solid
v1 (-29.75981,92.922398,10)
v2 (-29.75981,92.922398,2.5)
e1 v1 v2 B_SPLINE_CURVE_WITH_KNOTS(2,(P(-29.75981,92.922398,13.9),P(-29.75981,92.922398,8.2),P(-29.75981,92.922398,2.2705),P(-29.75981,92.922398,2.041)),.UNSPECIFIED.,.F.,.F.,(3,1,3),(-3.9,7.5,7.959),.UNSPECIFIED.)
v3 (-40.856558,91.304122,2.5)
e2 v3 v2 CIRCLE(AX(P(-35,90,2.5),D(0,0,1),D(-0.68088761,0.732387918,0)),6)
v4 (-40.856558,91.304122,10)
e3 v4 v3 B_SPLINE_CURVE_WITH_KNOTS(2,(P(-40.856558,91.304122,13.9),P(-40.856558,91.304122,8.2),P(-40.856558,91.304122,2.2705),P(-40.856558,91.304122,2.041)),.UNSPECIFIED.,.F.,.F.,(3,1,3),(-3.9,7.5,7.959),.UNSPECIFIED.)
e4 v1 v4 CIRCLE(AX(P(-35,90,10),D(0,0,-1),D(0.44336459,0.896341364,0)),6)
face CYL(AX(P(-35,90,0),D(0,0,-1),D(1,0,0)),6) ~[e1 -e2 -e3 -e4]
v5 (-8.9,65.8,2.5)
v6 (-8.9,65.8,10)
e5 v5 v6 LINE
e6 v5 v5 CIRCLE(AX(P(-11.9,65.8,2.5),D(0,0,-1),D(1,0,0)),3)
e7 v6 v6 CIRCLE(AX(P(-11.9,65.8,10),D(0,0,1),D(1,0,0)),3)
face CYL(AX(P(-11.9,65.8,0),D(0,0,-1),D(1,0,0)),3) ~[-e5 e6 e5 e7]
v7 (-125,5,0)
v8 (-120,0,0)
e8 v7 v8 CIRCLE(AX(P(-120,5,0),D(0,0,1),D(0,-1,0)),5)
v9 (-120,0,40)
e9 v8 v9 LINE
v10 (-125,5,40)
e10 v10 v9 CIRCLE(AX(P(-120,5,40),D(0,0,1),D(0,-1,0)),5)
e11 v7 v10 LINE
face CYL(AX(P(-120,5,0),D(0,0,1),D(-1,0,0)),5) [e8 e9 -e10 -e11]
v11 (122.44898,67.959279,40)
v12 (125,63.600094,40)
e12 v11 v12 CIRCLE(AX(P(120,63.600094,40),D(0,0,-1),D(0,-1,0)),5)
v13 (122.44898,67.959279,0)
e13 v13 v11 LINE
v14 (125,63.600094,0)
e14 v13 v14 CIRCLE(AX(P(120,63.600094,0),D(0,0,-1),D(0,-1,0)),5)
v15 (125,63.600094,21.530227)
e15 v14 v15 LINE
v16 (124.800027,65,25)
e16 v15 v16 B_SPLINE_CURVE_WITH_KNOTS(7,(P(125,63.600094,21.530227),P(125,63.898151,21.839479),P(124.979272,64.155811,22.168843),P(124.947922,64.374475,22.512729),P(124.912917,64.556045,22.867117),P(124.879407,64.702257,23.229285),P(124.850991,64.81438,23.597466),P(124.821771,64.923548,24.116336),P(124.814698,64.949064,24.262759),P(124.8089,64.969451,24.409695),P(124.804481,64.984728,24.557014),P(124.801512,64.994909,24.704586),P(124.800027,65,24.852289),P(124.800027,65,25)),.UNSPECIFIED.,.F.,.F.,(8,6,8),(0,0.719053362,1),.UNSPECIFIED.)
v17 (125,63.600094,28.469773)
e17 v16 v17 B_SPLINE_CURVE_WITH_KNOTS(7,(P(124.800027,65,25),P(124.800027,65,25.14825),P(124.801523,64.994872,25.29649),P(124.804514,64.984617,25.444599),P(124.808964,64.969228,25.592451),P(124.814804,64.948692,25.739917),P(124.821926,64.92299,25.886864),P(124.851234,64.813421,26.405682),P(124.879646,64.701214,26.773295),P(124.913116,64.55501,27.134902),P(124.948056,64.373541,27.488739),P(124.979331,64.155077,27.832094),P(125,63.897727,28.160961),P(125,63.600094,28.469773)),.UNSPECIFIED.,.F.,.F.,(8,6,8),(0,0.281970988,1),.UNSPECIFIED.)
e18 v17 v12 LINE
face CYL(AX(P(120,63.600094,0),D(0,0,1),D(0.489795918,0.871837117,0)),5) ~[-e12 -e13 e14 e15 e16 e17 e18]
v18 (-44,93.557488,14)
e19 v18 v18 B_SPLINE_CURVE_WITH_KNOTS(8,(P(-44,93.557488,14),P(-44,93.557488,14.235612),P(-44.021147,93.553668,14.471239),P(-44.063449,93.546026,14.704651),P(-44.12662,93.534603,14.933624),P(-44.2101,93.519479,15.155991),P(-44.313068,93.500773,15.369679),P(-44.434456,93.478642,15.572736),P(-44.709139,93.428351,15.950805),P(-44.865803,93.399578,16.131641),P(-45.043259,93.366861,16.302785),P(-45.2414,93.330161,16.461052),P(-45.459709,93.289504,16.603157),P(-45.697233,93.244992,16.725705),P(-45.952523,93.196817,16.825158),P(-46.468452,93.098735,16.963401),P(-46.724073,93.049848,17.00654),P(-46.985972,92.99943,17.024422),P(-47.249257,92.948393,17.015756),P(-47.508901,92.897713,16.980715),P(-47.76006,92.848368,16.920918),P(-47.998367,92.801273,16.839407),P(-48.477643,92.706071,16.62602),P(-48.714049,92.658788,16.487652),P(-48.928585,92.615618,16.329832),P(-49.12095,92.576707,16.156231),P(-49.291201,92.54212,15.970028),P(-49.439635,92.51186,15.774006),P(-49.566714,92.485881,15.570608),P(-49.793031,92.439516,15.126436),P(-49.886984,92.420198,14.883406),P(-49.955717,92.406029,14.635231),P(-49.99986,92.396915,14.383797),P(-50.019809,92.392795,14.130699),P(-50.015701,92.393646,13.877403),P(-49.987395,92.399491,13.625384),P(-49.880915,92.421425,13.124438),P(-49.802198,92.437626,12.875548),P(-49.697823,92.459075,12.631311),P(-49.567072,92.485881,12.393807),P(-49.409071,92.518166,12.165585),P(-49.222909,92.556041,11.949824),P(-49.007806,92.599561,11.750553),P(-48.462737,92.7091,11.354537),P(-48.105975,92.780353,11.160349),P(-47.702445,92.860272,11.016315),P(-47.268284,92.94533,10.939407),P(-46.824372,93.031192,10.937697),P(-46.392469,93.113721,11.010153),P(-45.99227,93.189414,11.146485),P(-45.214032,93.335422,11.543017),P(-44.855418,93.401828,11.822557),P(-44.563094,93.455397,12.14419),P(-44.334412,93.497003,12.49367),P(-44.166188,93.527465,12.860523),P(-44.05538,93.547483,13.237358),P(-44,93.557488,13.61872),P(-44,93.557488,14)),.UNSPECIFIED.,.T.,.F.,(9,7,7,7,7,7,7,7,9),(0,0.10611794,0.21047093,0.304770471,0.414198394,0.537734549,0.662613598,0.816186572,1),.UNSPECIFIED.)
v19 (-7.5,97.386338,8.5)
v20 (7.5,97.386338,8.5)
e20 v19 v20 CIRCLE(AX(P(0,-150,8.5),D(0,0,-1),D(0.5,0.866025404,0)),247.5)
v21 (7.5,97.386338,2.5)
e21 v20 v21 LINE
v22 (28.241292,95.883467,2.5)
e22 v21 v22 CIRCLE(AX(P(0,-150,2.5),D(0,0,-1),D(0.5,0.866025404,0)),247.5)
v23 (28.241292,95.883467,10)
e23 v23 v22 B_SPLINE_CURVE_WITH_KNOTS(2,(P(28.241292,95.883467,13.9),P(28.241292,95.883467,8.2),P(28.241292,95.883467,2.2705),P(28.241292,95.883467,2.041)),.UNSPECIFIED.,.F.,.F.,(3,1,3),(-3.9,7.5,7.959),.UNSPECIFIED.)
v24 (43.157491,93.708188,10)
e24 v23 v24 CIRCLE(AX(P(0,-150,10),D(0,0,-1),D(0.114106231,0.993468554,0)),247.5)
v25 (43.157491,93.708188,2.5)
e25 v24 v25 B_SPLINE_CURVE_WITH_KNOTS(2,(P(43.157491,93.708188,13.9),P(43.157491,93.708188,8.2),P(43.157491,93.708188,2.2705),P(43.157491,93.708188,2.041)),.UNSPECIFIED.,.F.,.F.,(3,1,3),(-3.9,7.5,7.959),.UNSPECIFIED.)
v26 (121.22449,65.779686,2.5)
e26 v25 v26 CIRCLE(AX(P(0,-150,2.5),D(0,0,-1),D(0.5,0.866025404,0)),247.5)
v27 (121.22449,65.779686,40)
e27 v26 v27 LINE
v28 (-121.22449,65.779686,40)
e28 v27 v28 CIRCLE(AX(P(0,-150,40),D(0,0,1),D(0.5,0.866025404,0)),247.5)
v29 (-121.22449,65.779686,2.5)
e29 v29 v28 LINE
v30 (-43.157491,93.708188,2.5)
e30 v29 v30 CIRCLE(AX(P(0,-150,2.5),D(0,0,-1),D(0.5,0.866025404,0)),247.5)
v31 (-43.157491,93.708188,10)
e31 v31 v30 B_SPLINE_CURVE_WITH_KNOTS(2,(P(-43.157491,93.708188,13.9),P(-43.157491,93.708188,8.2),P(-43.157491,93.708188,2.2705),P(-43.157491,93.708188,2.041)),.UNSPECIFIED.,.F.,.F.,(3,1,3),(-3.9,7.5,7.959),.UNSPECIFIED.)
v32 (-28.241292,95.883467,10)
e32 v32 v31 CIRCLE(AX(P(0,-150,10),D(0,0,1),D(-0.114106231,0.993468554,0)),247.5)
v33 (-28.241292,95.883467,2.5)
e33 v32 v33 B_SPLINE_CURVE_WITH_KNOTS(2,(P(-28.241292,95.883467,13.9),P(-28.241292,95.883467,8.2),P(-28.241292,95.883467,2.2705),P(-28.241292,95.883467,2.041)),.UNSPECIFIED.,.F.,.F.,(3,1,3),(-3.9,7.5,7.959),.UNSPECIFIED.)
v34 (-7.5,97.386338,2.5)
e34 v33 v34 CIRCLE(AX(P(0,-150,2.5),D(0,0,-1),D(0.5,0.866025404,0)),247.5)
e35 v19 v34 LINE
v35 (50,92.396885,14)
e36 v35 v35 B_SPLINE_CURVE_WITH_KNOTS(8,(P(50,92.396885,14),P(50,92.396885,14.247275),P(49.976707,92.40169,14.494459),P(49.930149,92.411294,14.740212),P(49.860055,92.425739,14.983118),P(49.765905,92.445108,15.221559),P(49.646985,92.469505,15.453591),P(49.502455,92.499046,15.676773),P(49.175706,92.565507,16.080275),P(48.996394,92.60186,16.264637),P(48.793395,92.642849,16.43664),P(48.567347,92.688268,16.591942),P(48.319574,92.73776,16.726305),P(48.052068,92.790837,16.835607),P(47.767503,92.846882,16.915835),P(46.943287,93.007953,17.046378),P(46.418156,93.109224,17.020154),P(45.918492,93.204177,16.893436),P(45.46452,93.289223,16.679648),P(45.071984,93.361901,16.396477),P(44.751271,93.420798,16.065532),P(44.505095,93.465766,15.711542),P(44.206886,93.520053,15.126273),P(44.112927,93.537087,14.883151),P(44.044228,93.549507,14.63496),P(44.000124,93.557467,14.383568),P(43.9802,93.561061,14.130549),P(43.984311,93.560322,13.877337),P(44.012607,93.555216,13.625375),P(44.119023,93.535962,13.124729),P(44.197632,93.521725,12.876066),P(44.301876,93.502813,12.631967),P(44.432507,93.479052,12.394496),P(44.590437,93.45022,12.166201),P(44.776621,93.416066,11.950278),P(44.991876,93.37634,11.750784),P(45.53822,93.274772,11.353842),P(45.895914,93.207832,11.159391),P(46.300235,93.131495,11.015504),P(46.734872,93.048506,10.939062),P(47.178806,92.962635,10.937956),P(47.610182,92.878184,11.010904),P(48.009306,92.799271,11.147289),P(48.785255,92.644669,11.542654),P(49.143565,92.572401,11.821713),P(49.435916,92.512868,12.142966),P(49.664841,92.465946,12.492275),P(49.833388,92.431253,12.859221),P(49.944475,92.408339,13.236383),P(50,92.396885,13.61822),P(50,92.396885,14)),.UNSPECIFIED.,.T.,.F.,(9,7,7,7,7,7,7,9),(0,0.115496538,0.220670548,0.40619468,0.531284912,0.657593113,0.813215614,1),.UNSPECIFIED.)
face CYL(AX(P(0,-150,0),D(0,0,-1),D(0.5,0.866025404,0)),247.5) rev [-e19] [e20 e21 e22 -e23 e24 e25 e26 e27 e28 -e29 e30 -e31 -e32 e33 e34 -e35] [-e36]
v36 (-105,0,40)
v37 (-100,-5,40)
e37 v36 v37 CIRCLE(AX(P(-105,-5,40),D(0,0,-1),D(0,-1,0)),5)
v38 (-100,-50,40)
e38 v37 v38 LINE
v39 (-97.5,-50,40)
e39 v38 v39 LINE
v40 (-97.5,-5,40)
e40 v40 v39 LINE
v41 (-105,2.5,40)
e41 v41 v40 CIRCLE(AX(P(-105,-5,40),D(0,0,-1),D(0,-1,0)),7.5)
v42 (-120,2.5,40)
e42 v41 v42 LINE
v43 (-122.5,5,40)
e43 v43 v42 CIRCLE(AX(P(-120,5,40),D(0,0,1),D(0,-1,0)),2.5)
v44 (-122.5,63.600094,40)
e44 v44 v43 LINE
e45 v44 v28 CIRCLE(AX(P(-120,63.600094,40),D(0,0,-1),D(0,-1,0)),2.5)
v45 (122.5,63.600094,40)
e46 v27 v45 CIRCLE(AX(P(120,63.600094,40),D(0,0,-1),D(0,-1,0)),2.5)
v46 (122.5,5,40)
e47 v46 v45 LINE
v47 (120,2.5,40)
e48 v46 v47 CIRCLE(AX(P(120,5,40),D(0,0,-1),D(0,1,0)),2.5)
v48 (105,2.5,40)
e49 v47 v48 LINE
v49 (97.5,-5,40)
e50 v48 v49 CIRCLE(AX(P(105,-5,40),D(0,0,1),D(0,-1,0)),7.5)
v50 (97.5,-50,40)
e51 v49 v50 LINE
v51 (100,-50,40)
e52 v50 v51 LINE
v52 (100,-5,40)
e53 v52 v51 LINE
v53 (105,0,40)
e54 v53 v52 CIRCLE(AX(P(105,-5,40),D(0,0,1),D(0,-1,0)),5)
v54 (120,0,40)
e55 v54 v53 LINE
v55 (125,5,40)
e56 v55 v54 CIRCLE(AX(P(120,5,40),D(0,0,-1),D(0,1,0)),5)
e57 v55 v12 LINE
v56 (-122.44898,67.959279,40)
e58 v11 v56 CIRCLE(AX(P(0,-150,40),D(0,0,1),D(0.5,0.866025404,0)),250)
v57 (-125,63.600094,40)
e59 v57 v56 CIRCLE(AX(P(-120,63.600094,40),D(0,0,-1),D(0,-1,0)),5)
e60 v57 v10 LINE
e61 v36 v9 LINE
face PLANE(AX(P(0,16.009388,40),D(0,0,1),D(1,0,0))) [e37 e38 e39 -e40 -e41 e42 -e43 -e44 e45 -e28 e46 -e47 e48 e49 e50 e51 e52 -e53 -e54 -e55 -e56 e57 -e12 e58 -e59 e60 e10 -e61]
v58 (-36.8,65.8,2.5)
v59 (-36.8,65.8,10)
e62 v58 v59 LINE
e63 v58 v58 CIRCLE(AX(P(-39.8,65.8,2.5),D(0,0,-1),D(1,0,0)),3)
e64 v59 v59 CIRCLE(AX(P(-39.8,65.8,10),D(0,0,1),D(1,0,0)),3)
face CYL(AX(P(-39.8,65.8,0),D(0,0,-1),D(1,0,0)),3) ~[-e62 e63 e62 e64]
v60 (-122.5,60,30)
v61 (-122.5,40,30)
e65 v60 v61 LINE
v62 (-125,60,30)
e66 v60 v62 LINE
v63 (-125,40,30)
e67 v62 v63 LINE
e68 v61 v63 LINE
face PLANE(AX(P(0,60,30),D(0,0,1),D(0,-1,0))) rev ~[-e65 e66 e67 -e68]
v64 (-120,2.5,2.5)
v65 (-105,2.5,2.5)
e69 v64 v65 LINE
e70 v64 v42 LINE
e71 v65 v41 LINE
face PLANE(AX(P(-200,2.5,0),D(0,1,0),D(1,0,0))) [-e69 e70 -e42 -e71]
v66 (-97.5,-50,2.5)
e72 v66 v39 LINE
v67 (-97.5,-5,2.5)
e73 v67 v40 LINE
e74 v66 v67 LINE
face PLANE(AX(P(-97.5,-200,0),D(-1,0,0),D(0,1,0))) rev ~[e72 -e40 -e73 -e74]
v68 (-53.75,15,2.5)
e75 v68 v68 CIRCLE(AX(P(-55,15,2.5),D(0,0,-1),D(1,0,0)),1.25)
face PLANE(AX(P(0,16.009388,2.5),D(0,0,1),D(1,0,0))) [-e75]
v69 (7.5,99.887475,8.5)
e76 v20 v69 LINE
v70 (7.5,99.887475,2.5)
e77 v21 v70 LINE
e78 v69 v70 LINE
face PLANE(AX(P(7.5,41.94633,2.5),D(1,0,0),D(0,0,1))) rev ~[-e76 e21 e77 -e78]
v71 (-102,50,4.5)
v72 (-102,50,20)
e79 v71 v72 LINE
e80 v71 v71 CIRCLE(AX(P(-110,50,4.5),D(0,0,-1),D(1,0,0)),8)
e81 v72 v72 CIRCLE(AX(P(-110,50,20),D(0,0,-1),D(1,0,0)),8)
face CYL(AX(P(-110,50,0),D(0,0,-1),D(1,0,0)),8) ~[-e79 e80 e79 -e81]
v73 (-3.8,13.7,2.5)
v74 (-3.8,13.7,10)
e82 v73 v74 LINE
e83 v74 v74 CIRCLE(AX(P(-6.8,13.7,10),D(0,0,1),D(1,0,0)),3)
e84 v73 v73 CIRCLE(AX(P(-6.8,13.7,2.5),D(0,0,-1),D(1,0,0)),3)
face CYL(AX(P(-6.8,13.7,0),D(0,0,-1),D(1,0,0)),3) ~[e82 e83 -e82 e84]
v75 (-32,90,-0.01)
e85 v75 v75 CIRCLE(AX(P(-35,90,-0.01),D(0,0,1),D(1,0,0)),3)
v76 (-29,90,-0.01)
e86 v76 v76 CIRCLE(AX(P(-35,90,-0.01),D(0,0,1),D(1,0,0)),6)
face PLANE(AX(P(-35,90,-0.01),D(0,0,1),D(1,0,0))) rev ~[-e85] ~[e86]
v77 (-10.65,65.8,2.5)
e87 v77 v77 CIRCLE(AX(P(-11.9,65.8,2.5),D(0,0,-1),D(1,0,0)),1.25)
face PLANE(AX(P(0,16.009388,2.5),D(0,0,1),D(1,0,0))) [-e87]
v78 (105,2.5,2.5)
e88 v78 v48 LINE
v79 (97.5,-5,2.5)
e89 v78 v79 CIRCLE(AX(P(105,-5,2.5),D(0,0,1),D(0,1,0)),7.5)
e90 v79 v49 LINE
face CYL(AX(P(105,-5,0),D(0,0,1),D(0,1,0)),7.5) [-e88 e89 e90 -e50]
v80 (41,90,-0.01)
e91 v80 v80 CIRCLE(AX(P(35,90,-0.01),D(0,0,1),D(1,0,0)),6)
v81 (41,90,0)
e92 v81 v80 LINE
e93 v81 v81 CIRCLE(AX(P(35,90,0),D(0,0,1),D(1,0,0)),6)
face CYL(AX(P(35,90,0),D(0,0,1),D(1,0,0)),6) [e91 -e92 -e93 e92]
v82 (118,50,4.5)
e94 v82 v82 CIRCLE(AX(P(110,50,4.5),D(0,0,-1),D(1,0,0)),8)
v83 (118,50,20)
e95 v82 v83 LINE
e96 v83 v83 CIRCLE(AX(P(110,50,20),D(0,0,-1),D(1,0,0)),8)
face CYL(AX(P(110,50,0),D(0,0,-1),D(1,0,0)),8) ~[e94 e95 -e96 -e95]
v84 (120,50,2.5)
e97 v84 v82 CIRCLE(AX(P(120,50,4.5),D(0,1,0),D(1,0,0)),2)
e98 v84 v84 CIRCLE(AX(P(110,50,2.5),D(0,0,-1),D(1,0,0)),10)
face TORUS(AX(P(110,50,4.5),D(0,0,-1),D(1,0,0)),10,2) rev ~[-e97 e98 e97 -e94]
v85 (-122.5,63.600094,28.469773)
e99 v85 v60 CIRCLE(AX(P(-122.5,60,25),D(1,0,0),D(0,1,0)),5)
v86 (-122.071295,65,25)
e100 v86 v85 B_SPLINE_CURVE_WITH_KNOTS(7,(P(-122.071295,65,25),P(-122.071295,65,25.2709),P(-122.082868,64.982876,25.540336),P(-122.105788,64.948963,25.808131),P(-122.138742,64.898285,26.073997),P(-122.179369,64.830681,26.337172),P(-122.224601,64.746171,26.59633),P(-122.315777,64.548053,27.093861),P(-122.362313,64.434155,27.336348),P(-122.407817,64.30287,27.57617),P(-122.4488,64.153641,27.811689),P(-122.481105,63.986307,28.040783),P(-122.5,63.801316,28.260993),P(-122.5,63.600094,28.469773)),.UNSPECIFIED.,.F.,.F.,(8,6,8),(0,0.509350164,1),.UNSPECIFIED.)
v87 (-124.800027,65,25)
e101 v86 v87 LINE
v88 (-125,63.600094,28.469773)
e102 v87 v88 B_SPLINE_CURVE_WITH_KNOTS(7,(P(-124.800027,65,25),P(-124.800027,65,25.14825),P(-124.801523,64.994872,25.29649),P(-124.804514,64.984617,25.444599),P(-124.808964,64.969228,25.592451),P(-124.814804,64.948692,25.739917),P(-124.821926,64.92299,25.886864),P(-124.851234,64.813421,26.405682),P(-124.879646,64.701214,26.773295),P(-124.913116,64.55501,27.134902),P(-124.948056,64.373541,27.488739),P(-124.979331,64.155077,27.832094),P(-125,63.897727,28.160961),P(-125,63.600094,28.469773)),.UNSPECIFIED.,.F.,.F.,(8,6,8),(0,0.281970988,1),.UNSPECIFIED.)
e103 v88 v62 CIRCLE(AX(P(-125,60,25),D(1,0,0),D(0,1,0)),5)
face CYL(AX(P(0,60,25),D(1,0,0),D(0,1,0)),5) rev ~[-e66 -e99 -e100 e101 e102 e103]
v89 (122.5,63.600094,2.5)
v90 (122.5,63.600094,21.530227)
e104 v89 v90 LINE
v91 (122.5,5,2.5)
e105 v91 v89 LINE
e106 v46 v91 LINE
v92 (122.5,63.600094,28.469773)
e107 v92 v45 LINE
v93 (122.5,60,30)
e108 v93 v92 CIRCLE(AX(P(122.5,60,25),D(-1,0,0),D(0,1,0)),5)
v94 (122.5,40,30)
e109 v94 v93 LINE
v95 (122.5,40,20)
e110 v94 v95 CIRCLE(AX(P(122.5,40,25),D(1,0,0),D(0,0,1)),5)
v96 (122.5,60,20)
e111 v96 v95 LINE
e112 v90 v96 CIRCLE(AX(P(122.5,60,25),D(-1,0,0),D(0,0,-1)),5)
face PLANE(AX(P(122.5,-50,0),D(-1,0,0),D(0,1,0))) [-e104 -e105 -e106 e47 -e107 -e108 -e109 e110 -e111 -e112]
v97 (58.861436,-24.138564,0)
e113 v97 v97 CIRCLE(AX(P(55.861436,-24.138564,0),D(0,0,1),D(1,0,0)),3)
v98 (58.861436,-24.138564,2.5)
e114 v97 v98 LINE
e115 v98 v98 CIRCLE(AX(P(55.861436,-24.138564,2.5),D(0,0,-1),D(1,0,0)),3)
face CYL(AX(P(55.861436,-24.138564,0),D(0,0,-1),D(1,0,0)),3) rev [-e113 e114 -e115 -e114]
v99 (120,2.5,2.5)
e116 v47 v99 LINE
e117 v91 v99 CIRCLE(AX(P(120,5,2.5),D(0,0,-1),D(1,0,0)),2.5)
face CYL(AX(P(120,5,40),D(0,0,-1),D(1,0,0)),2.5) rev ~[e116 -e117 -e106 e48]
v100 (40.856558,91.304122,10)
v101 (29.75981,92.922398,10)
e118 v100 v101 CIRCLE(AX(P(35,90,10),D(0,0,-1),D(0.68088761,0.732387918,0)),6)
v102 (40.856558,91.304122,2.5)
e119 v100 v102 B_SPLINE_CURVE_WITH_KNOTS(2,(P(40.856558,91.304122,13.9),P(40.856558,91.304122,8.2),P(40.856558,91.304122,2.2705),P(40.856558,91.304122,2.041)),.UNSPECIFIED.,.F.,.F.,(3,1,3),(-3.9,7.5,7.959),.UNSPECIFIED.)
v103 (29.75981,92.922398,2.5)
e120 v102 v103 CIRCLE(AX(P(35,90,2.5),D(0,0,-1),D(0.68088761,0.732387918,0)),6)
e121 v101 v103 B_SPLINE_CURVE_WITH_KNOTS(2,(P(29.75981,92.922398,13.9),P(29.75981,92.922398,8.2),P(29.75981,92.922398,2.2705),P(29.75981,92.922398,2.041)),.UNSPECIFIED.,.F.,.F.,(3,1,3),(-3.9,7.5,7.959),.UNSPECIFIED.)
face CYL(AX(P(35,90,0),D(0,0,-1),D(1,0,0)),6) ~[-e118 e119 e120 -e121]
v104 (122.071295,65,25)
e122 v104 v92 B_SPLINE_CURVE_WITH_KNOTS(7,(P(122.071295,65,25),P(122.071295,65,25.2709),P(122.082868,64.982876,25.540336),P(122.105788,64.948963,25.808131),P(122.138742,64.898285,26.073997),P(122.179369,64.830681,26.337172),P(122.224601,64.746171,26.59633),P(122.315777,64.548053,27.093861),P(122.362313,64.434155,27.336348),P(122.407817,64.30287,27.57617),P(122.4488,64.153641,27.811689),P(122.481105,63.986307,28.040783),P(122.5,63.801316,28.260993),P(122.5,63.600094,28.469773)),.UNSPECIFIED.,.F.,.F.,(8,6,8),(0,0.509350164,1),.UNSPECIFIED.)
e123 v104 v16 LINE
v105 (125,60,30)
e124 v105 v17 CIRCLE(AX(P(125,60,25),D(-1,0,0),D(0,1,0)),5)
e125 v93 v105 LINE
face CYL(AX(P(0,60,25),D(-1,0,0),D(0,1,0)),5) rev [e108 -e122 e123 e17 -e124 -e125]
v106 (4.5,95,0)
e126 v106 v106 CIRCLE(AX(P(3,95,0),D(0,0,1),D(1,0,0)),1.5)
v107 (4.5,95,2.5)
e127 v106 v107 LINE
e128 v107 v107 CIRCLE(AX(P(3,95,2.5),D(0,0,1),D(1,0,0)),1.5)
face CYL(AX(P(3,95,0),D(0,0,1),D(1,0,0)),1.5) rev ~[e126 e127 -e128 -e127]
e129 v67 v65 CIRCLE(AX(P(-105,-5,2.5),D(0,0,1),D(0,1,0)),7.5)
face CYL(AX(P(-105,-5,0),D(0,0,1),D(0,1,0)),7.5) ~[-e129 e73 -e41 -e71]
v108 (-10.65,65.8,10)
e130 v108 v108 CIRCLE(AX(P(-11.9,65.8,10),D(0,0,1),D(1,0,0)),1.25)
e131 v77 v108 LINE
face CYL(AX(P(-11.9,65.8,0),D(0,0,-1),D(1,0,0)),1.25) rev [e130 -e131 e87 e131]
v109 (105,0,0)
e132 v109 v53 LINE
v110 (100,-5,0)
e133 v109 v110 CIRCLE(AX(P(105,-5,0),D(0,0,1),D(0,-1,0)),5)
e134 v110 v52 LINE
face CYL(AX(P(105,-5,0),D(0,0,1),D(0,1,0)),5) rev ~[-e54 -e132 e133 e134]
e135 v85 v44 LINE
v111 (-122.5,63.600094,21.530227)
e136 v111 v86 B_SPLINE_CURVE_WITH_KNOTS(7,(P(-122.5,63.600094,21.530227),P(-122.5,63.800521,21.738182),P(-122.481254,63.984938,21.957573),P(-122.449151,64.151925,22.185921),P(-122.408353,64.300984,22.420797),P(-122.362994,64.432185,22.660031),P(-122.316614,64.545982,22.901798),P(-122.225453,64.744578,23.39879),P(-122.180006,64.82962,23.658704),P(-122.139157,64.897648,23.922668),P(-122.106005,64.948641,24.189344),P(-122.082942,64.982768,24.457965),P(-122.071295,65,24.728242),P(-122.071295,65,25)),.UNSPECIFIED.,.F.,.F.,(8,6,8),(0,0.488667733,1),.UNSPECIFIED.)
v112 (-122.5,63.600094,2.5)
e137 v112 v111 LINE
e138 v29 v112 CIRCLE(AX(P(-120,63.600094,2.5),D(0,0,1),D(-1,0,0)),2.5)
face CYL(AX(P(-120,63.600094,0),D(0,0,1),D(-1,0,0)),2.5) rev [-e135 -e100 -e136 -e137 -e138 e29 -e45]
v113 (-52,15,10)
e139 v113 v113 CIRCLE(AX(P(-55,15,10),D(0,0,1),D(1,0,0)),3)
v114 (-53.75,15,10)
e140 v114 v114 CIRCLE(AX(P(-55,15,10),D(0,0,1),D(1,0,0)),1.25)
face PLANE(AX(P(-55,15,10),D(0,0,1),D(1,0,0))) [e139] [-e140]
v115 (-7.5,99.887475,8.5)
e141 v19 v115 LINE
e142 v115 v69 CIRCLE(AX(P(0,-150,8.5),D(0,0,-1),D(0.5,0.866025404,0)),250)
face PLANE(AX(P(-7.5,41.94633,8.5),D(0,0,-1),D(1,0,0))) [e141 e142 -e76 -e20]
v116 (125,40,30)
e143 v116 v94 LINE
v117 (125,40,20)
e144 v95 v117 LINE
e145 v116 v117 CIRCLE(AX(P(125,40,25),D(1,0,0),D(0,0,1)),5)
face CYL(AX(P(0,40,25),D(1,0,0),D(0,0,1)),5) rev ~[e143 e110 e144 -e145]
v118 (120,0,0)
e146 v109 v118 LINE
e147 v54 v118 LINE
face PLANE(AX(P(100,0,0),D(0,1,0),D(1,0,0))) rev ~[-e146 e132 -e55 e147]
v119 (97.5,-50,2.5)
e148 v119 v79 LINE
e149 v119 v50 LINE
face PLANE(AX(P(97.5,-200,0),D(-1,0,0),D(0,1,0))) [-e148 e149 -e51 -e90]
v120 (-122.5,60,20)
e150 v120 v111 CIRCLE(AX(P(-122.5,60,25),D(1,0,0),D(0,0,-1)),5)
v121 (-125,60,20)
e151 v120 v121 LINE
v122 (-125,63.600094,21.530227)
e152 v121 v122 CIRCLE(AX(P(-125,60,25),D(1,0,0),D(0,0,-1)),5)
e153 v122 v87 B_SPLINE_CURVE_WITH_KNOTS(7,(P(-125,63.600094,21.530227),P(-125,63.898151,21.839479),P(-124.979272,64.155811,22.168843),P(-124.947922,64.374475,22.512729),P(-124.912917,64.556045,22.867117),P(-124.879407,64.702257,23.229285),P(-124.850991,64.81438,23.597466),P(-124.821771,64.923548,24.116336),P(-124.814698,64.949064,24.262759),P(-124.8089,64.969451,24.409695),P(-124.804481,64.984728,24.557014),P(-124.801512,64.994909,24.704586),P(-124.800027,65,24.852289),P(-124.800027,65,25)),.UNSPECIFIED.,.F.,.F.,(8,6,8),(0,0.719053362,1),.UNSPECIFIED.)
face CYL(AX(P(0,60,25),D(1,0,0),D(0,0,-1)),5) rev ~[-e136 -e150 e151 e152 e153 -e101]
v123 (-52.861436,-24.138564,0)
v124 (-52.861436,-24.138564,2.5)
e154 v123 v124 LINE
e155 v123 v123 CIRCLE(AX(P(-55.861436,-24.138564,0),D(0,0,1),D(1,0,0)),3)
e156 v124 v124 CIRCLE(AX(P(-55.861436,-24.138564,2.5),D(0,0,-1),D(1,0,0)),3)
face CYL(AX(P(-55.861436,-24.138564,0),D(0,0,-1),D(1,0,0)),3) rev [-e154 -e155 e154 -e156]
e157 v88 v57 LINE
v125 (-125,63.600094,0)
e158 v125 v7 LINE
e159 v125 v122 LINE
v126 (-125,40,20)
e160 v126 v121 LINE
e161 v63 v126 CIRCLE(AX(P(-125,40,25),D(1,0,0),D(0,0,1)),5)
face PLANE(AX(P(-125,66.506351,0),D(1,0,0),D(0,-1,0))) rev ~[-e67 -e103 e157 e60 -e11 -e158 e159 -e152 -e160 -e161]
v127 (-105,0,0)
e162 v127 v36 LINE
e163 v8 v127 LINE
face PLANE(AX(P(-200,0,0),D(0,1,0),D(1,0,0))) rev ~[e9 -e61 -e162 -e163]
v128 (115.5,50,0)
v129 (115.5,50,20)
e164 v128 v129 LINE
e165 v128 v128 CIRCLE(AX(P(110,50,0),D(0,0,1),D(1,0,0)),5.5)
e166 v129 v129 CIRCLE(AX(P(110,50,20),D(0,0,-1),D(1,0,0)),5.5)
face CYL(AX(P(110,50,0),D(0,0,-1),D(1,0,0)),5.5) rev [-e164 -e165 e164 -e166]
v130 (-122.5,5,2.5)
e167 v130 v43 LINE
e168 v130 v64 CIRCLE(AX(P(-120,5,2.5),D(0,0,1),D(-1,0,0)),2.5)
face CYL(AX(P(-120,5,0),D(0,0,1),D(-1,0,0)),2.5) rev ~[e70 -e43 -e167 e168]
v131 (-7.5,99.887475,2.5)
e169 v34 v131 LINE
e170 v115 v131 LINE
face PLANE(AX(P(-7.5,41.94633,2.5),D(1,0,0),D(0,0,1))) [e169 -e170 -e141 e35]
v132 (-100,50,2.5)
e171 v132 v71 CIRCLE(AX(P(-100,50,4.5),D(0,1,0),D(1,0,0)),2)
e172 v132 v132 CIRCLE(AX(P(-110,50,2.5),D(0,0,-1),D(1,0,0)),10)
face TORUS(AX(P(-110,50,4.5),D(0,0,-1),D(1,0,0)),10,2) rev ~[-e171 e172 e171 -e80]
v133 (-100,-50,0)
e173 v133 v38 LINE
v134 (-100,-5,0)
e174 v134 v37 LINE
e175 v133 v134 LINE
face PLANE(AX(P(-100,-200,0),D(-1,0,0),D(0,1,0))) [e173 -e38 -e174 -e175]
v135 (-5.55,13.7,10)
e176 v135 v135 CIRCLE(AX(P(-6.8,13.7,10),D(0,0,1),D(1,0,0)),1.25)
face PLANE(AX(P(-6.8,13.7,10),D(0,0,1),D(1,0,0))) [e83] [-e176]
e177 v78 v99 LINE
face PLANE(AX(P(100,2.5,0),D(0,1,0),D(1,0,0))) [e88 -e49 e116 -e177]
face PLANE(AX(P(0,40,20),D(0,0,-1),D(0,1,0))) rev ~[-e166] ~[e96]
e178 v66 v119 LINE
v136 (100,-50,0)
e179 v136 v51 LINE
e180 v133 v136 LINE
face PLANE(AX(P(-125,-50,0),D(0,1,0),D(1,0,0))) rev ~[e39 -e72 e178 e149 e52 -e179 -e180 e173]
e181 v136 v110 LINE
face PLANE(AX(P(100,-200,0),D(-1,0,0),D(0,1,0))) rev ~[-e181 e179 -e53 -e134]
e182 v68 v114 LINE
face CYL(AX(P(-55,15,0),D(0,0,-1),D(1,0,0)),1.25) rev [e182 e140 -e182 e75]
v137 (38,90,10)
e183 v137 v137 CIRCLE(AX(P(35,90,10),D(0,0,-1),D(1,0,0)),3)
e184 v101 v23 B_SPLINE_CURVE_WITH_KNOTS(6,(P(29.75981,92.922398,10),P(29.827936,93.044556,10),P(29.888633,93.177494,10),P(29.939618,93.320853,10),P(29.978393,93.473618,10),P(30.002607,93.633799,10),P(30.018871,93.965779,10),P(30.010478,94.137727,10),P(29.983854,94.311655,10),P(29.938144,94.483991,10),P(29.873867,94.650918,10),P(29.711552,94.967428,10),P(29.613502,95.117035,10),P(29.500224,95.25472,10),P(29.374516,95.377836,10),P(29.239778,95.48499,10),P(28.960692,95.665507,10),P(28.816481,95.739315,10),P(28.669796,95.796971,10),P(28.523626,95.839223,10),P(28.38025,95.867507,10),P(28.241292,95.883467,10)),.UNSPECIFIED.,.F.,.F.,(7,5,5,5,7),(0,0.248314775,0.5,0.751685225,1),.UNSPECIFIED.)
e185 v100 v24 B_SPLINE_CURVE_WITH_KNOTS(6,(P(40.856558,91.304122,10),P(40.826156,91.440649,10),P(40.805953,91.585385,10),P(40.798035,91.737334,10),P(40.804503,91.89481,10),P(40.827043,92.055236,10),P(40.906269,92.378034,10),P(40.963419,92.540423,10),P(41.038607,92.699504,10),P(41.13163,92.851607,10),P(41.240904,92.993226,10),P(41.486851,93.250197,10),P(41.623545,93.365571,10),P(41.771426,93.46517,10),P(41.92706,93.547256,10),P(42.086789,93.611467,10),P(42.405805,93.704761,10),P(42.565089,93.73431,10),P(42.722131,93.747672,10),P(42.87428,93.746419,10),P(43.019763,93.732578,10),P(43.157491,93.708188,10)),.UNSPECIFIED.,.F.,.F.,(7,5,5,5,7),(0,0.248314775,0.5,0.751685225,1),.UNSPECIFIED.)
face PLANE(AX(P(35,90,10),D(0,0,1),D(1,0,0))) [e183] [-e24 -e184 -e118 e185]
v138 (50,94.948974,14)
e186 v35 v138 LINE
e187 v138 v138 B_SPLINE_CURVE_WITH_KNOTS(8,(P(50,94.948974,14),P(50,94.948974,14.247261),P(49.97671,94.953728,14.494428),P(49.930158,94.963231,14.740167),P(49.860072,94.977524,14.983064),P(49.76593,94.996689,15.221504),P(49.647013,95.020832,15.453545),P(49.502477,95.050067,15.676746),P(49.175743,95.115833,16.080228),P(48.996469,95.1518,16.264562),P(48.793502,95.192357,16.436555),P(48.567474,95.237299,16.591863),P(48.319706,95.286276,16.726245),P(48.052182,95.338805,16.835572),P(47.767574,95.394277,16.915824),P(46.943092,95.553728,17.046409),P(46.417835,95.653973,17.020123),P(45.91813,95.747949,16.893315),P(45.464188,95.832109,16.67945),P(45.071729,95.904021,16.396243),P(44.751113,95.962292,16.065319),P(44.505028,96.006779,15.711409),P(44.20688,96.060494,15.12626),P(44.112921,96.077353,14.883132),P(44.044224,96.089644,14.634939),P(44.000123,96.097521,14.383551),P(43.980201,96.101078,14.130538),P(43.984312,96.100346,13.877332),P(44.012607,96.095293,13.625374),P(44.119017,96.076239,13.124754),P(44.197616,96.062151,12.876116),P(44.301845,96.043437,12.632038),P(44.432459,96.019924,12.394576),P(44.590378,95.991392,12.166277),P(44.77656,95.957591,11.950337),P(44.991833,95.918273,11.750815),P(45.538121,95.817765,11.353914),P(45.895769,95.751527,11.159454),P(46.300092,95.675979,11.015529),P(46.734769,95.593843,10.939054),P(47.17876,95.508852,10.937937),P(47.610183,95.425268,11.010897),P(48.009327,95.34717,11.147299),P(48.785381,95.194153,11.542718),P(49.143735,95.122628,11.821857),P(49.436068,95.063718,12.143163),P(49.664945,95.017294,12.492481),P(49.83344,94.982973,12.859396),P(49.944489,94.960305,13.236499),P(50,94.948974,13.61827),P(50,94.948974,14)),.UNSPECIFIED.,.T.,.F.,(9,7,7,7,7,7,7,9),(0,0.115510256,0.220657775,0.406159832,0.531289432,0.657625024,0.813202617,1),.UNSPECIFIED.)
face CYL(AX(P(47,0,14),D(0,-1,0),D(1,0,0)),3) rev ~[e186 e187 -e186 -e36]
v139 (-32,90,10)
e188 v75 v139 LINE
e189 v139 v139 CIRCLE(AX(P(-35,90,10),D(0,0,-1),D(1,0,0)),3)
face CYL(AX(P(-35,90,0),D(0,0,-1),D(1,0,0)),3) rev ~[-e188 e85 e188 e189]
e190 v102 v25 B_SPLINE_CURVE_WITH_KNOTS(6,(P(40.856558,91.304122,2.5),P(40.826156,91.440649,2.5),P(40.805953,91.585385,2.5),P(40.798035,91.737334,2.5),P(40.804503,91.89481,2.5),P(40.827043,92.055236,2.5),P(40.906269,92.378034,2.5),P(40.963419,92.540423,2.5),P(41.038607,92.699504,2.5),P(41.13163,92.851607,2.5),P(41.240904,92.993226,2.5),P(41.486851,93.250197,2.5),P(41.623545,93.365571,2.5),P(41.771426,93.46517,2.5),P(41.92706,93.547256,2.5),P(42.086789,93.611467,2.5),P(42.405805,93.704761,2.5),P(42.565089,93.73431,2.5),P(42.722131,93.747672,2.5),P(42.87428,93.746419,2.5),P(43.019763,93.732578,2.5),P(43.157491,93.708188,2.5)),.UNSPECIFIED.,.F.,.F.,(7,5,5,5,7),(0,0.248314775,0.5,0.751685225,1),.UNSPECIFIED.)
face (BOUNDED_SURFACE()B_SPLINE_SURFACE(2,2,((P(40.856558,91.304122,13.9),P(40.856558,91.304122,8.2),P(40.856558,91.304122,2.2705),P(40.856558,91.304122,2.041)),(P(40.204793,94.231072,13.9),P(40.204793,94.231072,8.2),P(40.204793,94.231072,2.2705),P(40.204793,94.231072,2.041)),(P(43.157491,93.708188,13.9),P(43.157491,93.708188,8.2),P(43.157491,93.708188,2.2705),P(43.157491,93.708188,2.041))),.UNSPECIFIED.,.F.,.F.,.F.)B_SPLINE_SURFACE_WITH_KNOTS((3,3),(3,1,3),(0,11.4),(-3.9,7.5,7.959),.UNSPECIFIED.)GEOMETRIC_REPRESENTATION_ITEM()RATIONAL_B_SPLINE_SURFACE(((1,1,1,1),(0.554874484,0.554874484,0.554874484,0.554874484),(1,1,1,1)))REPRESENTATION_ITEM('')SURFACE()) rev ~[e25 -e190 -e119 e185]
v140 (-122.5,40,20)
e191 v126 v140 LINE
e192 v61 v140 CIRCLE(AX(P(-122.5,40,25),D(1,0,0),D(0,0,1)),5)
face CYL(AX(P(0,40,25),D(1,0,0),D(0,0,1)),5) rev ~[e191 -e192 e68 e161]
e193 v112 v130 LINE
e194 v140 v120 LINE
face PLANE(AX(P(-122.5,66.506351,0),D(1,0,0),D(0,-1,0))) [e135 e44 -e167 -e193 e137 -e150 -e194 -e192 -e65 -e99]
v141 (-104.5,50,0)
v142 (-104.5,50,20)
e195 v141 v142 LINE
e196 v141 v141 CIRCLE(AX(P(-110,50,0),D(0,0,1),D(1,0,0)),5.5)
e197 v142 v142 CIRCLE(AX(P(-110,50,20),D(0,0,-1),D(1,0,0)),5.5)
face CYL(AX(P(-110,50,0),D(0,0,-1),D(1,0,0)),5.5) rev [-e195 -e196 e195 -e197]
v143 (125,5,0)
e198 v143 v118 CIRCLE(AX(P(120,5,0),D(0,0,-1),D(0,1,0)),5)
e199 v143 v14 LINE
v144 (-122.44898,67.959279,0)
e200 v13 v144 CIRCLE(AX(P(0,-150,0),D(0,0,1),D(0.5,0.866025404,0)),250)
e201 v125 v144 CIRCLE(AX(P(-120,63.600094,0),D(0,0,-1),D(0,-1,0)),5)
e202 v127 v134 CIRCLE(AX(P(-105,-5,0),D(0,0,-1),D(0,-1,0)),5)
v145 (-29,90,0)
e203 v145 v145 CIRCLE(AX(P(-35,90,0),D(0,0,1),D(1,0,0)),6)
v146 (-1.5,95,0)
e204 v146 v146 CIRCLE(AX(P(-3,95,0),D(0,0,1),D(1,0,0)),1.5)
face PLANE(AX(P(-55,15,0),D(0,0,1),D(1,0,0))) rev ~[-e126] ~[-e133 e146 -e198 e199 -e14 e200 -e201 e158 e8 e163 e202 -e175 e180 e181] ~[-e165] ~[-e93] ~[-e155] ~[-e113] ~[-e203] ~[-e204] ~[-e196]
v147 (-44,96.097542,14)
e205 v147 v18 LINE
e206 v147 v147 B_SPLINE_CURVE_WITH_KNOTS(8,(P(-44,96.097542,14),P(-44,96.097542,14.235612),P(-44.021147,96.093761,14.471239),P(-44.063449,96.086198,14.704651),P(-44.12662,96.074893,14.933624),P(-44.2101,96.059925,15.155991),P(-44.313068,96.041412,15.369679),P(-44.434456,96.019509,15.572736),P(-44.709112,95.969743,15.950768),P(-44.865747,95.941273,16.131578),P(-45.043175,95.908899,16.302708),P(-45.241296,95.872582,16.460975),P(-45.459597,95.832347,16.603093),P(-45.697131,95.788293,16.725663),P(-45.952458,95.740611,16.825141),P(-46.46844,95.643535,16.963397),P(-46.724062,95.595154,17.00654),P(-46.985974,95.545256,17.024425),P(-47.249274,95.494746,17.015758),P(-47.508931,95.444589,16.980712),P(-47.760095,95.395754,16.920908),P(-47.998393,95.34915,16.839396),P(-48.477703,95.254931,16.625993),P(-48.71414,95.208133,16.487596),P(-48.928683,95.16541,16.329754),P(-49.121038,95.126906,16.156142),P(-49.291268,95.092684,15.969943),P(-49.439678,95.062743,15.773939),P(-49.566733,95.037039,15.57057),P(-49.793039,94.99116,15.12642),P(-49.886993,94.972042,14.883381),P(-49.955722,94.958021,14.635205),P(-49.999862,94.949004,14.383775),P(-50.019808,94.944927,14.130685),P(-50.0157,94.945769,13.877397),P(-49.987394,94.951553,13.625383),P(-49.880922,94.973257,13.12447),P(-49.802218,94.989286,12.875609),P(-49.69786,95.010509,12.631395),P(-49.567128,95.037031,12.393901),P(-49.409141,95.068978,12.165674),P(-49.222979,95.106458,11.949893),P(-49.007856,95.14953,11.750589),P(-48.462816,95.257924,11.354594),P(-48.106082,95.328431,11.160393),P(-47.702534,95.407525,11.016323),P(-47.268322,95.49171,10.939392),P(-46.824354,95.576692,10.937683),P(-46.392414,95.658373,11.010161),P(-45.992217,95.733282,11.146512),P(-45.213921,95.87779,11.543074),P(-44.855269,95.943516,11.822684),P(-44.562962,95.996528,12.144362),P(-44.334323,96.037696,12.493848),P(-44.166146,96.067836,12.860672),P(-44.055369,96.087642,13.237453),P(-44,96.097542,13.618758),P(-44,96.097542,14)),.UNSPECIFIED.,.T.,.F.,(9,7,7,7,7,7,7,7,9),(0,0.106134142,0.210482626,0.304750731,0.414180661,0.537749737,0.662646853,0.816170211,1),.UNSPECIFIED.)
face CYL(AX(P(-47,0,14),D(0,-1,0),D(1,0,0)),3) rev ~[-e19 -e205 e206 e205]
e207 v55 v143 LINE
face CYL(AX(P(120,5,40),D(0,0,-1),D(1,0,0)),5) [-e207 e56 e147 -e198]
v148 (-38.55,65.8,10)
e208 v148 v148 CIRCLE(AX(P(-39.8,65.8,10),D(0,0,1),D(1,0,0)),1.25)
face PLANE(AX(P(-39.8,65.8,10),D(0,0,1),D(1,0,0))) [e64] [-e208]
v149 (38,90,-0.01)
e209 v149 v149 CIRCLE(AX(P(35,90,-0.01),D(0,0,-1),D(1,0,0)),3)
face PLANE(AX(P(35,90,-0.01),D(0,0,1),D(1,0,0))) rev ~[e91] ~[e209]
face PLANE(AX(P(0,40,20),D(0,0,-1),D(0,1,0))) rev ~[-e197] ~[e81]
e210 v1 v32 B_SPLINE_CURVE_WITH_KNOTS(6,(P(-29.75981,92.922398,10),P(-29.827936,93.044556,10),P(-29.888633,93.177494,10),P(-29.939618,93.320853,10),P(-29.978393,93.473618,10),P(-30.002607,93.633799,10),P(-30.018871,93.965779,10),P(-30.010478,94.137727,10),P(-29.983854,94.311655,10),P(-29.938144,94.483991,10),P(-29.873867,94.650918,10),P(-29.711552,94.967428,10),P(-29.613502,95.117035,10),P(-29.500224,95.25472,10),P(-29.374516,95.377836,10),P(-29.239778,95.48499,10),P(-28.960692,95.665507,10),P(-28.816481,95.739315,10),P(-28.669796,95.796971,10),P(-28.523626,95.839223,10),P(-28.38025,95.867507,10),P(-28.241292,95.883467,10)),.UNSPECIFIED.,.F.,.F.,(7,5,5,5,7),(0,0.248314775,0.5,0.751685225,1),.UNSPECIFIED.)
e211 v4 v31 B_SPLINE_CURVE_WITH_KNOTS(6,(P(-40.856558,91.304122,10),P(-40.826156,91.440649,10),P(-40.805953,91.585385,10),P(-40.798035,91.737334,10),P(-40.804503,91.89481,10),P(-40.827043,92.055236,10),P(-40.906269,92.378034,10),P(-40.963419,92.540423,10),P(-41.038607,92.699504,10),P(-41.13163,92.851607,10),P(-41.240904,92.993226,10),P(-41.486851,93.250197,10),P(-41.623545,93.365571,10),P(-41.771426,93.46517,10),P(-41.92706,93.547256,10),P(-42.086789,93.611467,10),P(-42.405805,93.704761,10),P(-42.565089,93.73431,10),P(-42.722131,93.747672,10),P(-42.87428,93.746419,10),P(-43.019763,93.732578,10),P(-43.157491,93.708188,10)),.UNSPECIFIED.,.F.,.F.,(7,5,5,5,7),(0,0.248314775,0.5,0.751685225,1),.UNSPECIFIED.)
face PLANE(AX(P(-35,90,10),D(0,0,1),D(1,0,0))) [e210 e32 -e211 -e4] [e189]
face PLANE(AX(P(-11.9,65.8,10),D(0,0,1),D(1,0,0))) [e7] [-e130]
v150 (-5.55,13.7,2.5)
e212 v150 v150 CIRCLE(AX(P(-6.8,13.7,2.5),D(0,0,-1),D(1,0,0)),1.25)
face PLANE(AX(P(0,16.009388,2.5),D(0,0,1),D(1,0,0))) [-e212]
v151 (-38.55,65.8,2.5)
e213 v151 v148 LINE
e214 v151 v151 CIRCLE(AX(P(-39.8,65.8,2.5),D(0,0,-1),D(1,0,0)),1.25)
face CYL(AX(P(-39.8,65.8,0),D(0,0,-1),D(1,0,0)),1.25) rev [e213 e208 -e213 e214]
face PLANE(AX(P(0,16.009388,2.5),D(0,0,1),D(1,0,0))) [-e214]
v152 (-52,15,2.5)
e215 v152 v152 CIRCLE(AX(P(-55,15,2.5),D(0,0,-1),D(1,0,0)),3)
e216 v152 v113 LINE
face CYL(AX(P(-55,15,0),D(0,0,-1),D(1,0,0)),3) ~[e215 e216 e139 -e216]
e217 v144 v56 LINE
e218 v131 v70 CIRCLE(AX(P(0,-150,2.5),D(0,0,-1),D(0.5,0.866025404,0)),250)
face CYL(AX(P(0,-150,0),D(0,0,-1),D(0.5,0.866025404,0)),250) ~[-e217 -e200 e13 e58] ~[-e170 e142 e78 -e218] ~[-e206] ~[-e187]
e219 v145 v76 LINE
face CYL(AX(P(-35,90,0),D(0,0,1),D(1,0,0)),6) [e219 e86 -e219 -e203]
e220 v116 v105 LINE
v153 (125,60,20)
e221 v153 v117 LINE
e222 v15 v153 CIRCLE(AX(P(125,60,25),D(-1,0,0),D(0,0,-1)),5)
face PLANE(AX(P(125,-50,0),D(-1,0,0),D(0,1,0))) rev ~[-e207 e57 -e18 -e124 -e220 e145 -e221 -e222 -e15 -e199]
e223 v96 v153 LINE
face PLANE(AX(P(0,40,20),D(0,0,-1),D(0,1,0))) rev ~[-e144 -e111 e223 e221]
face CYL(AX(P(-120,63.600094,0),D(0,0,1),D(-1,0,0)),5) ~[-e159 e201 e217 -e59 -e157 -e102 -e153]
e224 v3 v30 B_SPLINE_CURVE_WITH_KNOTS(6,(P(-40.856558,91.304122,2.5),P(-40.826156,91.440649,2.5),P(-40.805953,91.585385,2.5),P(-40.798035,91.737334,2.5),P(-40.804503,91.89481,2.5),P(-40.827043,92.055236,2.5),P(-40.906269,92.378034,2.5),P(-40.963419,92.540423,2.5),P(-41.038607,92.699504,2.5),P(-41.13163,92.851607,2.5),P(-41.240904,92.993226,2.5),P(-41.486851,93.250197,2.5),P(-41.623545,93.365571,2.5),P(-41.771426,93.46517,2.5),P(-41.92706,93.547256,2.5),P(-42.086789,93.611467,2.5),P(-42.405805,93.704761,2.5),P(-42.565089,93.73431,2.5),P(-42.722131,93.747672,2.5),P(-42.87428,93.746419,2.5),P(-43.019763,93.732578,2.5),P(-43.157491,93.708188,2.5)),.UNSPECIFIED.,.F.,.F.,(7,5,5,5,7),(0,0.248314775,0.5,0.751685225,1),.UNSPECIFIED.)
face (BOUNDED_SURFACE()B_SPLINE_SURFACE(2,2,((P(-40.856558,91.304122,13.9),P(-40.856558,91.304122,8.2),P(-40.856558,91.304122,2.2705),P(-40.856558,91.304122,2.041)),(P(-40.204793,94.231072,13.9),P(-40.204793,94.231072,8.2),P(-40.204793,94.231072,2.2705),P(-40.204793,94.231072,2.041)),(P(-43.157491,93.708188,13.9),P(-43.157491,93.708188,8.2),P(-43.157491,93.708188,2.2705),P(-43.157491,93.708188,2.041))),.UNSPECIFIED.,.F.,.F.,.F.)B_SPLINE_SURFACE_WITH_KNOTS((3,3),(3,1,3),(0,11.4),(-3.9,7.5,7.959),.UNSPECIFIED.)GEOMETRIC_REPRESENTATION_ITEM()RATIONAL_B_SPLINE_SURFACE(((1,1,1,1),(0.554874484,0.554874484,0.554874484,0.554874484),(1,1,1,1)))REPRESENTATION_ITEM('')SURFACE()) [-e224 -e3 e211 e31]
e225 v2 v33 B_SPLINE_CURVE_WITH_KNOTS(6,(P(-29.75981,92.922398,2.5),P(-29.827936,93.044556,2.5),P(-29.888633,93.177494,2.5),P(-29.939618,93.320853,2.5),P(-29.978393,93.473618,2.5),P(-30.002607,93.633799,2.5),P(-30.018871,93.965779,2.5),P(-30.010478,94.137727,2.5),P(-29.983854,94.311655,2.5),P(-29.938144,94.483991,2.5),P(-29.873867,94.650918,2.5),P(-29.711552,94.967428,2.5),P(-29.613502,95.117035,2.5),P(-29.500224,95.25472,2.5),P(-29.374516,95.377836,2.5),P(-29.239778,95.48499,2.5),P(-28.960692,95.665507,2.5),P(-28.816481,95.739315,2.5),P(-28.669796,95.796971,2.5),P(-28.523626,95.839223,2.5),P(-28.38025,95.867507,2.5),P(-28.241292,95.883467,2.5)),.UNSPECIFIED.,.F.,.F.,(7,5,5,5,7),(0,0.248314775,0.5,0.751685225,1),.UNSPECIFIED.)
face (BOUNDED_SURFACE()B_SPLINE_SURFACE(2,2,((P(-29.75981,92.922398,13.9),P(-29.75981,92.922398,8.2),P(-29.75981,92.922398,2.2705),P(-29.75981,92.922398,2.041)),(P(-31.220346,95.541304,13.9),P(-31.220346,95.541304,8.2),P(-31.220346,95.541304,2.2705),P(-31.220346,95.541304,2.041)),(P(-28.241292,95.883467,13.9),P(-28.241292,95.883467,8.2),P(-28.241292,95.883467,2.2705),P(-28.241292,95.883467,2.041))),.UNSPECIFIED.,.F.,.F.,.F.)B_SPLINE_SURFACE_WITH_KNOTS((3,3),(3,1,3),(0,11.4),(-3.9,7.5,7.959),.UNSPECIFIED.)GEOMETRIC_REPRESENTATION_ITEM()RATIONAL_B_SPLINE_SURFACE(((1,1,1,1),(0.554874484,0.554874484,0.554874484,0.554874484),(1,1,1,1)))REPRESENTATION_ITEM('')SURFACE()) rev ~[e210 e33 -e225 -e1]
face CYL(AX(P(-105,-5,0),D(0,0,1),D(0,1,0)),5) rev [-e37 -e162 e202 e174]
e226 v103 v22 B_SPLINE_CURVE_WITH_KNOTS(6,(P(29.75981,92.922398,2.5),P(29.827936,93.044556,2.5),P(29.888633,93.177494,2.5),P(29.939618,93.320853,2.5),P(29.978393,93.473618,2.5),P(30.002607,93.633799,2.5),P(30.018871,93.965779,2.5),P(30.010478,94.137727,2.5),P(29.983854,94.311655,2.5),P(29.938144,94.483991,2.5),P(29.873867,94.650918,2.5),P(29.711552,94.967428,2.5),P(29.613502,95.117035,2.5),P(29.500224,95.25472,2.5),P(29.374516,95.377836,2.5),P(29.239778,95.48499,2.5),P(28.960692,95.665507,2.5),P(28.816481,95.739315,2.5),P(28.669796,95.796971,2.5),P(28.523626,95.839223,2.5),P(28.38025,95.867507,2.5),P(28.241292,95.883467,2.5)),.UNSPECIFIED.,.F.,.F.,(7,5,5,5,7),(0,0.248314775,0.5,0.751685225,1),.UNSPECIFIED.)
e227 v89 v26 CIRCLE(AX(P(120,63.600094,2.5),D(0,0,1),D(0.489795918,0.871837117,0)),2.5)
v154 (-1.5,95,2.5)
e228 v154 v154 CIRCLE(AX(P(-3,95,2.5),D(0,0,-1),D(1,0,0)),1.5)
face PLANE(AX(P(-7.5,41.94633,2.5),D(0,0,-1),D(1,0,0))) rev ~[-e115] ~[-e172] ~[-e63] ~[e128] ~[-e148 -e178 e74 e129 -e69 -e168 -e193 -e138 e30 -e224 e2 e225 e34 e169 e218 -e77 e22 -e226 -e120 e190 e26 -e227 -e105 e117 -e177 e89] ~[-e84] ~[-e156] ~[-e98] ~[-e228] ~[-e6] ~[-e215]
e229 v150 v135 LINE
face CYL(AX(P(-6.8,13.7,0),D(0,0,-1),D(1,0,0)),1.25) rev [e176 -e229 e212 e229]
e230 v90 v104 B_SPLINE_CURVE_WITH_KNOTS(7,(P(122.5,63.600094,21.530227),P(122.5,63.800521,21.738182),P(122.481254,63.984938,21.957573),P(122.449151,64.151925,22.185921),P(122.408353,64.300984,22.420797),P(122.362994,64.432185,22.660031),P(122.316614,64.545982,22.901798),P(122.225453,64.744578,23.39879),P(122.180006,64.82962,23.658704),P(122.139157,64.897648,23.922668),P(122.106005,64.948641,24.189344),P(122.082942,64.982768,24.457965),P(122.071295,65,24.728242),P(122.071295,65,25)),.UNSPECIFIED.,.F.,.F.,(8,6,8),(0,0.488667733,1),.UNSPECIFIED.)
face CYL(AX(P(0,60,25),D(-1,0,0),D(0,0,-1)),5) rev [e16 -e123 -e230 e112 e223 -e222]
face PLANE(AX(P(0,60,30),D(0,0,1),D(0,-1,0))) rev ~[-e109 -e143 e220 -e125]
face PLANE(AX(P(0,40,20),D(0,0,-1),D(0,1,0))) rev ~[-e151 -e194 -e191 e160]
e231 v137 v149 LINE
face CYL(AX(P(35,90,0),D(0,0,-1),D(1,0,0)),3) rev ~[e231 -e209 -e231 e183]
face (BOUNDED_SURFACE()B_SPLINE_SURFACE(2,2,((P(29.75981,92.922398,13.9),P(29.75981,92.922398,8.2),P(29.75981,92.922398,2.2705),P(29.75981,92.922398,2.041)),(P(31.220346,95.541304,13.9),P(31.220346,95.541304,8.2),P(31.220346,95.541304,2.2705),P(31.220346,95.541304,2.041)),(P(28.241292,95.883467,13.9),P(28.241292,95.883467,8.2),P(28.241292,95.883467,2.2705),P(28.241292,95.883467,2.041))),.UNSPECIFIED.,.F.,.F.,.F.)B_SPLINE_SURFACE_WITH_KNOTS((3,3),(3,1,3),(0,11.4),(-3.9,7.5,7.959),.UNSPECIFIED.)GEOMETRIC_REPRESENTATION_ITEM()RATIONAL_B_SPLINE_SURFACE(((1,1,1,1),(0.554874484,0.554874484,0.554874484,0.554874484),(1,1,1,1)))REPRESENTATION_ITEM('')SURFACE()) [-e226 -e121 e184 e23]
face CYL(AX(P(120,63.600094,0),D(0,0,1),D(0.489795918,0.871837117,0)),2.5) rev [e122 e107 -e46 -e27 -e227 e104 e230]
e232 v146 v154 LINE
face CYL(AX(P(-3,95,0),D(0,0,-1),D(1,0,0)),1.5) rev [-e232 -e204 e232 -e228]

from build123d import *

# Parameters (mm, degrees)
F1_DEPTH       = 40
F2_W           = 100
F2_H           = 200
F3_DEPTH       = 100
F4_R           = 5
F5_T           = -2.5
F6_R           = 3
F7_DEPTH       = 25
F8_R           = 8
F9_DEPTH       = 25
F10_R          = 5.5
F11_DEPTH      = 25
F12_R          = 3
F12_R_2        = 1.25
F13_DEPTH      = 10
F14_R          = 3
F15_DEPTH      = 150
F17_START      = -41.94633
F16_W          = 15
F16_H          = 6
F17_DEPTH      = 208.05367
F18_R          = 1.5
F19_DEPTH      = 12.5
F20_R          = 6
F21_DEPTH      = 0.01
F21_DEPTH_BACK = 10
F22_R          = 3
F23_DEPTH      = 12.5
F24_R          = 2
F26_DEPTH      = 150


with BuildPart() as f1:
    # F0 (on Top) → F1 (new body)
    with BuildSketch(Plane.XY):
        with BuildLine():
            Line((-125, 66.5063509461), (-125, -50))
            Line((-125, -50), (125, -50))
            Line((125, -50), (125, 66.5063509461))
            ThreePointArc((125, 66.5063509461), (64.7047614336, 91.4814565299), (3.27e-07, 100))
            ThreePointArc((3.27e-07, 100), (-64.7047611177, 91.4814566146), (-125, 66.5063509461))
        make_face()
    extrude(amount=F1_DEPTH)

    # F2 (on Top) → F3 (cut)
    with BuildSketch(Plane.XY):
        with Locations((-150, -100)):
            Rectangle(F2_W, F2_H)
        with Locations((150, -100)):
            Rectangle(F2_W, F2_H)
    extrude(amount=F3_DEPTH, mode=Mode.SUBTRACT)

    # F4
    f4_edges = [f1.edges().sort_by_distance(p)[0] for p in [
        (-125, 66.506351, 20),
        (125, 66.506351, 20),
        (125, 0, 20),
        (100, 0, 20),
        (-125, 0, 20),
        (-100, 0, 20),
    ]]
    fillet(f4_edges, radius=F4_R)

    # F5
    f5_openings = [f1.faces().sort_by_distance(p)[0] for p in [
        (0, 23.401227, 40),
        (0, -50, 20),
    ]]
    offset(amount=F5_T, openings=f5_openings)

    # F6 (on Top) → F7 (cut)
    with BuildSketch(Plane.XY):
        with Locations((-55.8614357137, -24.1385642863)):
            Circle(F6_R)
        with Locations((55.8614357137, -24.1385642863)):
            Circle(F6_R)
    extrude(amount=F7_DEPTH, mode=Mode.SUBTRACT)

    # F8 (on Top) → F9 (join)
    with BuildSketch(Plane.XY):
        with Locations((-110, 50)):
            Circle(F8_R)
        with Locations((110, 50)):
            Circle(F8_R)
    extrude(amount=F9_DEPTH)

    # F10 (on Top) → F11 (cut)
    with BuildSketch(Plane.XY):
        with Locations((-110, 50)):
            Circle(F10_R)
        with Locations((110, 50)):
            Circle(F10_R)
    extrude(amount=F11_DEPTH, mode=Mode.SUBTRACT)

    # F12 (on Top) → F13 (join)
    with BuildSketch(Plane.XY):
        with Locations((-55, 15)):
            Circle(F12_R)
        with Locations((-55, 15)):
            Circle(F12_R_2, mode=Mode.SUBTRACT)
        with Locations((-39.8, 65.8)):
            Circle(F12_R)
        with Locations((-39.8, 65.8)):
            Circle(F12_R_2, mode=Mode.SUBTRACT)
        with Locations((-11.9, 65.8)):
            Circle(F12_R)
        with Locations((-11.9, 65.8)):
            Circle(F12_R_2, mode=Mode.SUBTRACT)
        with Locations((-6.8, 13.7)):
            Circle(F12_R)
        with Locations((-6.8, 13.7)):
            Circle(F12_R_2, mode=Mode.SUBTRACT)
    extrude(amount=F13_DEPTH)

    # F14 (on Front) → F15 (cut, symmetric)
    with BuildSketch(Plane.XZ):
        with Locations((47, 14)):
            Circle(F14_R)
        with Locations((-47, 14)):
            Circle(F14_R)
    extrude(amount=F15_DEPTH, both=True, mode=Mode.SUBTRACT)

    # F16 (on Front) → F17 (cut)
    with BuildSketch(Plane.XZ.offset(F17_START)):
        with Locations((0, 5.5)):
            Rectangle(F16_W, F16_H)
    extrude(amount=-F17_DEPTH, mode=Mode.SUBTRACT)

    # F18 (on Top) → F19 (cut, symmetric)
    with BuildSketch(Plane.XY):
        with Locations((-3, 95)):
            Circle(F18_R)
        with Locations((3, 95)):
            Circle(F18_R)
    extrude(amount=F19_DEPTH, both=True, mode=Mode.SUBTRACT)

    # F20 (on Top) → F21 (join, two sides)
    with BuildSketch(Plane.XY) as f21_sk:
        with Locations((-35, 90)):
            Circle(F20_R)
        with Locations((35, 90)):
            Circle(F20_R)
    extrude(amount=-F21_DEPTH)
    extrude(f21_sk.sketch, amount=F21_DEPTH_BACK)

    # F22 (on face) → F23 (cut, symmetric)
    with BuildSketch(Plane(origin=(0, 0, 0), x_dir=(1, 0, 0), z_dir=(0, 0, -1))):
        with Locations((-35, -90)):
            Circle(F22_R)
        with Locations((35, -90)):
            Circle(F22_R)
    extrude(amount=F23_DEPTH, both=True, mode=Mode.SUBTRACT)

    # F24
    f24_edges = [f1.edges().sort_by_distance(p)[0] for p in [
        (-32.339812, 95.378048, 6.25),
        (-39.085326, 94.394328, 6.25),
        (39.085326, 94.394328, 6.25),
        (32.339812, 95.378048, 6.25),
        (-118, 50, 2.5),
        (102, 50, 2.5),
    ]]
    fillet(f24_edges, radius=F24_R)

    # F25 (on Right) → F26 (cut, symmetric)
    with BuildSketch(Plane.YZ):
        with BuildLine():
            Line((40, 20), (40, 30))
            ThreePointArc((40, 30), (35, 25), (40, 20))
        make_face()
        with BuildLine():
            ThreePointArc((65, 25), (63.5355339059, 28.5355339059), (60, 30))
            Line((60, 30), (60, 20))
            ThreePointArc((60, 20), (63.5355339059, 21.4644660941), (65, 25))
        make_face()
        with BuildLine():
            Line((60, 30), (40, 30))
            ThreePointArc((40, 30), (43.5355339059, 28.5355339059), (45, 25))
            ThreePointArc((45, 25), (43.5355339059, 21.4644660941), (40, 20))
            Line((40, 20), (60, 20))
            ThreePointArc((60, 20), (55, 25), (60, 30))
        make_face()
        with BuildLine():
            ThreePointArc((45, 25), (43.5355339059, 28.5355339059), (40, 30))
            Line((40, 30), (40, 20))
            ThreePointArc((40, 20), (43.5355339059, 21.4644660941), (45, 25))
        make_face()
        with BuildLine():
            Line((60, 20), (60, 30))
            ThreePointArc((60, 30), (55, 25), (60, 20))
        make_face()
    extrude(amount=F26_DEPTH, both=True, mode=Mode.SUBTRACT)


solid = f1.part
